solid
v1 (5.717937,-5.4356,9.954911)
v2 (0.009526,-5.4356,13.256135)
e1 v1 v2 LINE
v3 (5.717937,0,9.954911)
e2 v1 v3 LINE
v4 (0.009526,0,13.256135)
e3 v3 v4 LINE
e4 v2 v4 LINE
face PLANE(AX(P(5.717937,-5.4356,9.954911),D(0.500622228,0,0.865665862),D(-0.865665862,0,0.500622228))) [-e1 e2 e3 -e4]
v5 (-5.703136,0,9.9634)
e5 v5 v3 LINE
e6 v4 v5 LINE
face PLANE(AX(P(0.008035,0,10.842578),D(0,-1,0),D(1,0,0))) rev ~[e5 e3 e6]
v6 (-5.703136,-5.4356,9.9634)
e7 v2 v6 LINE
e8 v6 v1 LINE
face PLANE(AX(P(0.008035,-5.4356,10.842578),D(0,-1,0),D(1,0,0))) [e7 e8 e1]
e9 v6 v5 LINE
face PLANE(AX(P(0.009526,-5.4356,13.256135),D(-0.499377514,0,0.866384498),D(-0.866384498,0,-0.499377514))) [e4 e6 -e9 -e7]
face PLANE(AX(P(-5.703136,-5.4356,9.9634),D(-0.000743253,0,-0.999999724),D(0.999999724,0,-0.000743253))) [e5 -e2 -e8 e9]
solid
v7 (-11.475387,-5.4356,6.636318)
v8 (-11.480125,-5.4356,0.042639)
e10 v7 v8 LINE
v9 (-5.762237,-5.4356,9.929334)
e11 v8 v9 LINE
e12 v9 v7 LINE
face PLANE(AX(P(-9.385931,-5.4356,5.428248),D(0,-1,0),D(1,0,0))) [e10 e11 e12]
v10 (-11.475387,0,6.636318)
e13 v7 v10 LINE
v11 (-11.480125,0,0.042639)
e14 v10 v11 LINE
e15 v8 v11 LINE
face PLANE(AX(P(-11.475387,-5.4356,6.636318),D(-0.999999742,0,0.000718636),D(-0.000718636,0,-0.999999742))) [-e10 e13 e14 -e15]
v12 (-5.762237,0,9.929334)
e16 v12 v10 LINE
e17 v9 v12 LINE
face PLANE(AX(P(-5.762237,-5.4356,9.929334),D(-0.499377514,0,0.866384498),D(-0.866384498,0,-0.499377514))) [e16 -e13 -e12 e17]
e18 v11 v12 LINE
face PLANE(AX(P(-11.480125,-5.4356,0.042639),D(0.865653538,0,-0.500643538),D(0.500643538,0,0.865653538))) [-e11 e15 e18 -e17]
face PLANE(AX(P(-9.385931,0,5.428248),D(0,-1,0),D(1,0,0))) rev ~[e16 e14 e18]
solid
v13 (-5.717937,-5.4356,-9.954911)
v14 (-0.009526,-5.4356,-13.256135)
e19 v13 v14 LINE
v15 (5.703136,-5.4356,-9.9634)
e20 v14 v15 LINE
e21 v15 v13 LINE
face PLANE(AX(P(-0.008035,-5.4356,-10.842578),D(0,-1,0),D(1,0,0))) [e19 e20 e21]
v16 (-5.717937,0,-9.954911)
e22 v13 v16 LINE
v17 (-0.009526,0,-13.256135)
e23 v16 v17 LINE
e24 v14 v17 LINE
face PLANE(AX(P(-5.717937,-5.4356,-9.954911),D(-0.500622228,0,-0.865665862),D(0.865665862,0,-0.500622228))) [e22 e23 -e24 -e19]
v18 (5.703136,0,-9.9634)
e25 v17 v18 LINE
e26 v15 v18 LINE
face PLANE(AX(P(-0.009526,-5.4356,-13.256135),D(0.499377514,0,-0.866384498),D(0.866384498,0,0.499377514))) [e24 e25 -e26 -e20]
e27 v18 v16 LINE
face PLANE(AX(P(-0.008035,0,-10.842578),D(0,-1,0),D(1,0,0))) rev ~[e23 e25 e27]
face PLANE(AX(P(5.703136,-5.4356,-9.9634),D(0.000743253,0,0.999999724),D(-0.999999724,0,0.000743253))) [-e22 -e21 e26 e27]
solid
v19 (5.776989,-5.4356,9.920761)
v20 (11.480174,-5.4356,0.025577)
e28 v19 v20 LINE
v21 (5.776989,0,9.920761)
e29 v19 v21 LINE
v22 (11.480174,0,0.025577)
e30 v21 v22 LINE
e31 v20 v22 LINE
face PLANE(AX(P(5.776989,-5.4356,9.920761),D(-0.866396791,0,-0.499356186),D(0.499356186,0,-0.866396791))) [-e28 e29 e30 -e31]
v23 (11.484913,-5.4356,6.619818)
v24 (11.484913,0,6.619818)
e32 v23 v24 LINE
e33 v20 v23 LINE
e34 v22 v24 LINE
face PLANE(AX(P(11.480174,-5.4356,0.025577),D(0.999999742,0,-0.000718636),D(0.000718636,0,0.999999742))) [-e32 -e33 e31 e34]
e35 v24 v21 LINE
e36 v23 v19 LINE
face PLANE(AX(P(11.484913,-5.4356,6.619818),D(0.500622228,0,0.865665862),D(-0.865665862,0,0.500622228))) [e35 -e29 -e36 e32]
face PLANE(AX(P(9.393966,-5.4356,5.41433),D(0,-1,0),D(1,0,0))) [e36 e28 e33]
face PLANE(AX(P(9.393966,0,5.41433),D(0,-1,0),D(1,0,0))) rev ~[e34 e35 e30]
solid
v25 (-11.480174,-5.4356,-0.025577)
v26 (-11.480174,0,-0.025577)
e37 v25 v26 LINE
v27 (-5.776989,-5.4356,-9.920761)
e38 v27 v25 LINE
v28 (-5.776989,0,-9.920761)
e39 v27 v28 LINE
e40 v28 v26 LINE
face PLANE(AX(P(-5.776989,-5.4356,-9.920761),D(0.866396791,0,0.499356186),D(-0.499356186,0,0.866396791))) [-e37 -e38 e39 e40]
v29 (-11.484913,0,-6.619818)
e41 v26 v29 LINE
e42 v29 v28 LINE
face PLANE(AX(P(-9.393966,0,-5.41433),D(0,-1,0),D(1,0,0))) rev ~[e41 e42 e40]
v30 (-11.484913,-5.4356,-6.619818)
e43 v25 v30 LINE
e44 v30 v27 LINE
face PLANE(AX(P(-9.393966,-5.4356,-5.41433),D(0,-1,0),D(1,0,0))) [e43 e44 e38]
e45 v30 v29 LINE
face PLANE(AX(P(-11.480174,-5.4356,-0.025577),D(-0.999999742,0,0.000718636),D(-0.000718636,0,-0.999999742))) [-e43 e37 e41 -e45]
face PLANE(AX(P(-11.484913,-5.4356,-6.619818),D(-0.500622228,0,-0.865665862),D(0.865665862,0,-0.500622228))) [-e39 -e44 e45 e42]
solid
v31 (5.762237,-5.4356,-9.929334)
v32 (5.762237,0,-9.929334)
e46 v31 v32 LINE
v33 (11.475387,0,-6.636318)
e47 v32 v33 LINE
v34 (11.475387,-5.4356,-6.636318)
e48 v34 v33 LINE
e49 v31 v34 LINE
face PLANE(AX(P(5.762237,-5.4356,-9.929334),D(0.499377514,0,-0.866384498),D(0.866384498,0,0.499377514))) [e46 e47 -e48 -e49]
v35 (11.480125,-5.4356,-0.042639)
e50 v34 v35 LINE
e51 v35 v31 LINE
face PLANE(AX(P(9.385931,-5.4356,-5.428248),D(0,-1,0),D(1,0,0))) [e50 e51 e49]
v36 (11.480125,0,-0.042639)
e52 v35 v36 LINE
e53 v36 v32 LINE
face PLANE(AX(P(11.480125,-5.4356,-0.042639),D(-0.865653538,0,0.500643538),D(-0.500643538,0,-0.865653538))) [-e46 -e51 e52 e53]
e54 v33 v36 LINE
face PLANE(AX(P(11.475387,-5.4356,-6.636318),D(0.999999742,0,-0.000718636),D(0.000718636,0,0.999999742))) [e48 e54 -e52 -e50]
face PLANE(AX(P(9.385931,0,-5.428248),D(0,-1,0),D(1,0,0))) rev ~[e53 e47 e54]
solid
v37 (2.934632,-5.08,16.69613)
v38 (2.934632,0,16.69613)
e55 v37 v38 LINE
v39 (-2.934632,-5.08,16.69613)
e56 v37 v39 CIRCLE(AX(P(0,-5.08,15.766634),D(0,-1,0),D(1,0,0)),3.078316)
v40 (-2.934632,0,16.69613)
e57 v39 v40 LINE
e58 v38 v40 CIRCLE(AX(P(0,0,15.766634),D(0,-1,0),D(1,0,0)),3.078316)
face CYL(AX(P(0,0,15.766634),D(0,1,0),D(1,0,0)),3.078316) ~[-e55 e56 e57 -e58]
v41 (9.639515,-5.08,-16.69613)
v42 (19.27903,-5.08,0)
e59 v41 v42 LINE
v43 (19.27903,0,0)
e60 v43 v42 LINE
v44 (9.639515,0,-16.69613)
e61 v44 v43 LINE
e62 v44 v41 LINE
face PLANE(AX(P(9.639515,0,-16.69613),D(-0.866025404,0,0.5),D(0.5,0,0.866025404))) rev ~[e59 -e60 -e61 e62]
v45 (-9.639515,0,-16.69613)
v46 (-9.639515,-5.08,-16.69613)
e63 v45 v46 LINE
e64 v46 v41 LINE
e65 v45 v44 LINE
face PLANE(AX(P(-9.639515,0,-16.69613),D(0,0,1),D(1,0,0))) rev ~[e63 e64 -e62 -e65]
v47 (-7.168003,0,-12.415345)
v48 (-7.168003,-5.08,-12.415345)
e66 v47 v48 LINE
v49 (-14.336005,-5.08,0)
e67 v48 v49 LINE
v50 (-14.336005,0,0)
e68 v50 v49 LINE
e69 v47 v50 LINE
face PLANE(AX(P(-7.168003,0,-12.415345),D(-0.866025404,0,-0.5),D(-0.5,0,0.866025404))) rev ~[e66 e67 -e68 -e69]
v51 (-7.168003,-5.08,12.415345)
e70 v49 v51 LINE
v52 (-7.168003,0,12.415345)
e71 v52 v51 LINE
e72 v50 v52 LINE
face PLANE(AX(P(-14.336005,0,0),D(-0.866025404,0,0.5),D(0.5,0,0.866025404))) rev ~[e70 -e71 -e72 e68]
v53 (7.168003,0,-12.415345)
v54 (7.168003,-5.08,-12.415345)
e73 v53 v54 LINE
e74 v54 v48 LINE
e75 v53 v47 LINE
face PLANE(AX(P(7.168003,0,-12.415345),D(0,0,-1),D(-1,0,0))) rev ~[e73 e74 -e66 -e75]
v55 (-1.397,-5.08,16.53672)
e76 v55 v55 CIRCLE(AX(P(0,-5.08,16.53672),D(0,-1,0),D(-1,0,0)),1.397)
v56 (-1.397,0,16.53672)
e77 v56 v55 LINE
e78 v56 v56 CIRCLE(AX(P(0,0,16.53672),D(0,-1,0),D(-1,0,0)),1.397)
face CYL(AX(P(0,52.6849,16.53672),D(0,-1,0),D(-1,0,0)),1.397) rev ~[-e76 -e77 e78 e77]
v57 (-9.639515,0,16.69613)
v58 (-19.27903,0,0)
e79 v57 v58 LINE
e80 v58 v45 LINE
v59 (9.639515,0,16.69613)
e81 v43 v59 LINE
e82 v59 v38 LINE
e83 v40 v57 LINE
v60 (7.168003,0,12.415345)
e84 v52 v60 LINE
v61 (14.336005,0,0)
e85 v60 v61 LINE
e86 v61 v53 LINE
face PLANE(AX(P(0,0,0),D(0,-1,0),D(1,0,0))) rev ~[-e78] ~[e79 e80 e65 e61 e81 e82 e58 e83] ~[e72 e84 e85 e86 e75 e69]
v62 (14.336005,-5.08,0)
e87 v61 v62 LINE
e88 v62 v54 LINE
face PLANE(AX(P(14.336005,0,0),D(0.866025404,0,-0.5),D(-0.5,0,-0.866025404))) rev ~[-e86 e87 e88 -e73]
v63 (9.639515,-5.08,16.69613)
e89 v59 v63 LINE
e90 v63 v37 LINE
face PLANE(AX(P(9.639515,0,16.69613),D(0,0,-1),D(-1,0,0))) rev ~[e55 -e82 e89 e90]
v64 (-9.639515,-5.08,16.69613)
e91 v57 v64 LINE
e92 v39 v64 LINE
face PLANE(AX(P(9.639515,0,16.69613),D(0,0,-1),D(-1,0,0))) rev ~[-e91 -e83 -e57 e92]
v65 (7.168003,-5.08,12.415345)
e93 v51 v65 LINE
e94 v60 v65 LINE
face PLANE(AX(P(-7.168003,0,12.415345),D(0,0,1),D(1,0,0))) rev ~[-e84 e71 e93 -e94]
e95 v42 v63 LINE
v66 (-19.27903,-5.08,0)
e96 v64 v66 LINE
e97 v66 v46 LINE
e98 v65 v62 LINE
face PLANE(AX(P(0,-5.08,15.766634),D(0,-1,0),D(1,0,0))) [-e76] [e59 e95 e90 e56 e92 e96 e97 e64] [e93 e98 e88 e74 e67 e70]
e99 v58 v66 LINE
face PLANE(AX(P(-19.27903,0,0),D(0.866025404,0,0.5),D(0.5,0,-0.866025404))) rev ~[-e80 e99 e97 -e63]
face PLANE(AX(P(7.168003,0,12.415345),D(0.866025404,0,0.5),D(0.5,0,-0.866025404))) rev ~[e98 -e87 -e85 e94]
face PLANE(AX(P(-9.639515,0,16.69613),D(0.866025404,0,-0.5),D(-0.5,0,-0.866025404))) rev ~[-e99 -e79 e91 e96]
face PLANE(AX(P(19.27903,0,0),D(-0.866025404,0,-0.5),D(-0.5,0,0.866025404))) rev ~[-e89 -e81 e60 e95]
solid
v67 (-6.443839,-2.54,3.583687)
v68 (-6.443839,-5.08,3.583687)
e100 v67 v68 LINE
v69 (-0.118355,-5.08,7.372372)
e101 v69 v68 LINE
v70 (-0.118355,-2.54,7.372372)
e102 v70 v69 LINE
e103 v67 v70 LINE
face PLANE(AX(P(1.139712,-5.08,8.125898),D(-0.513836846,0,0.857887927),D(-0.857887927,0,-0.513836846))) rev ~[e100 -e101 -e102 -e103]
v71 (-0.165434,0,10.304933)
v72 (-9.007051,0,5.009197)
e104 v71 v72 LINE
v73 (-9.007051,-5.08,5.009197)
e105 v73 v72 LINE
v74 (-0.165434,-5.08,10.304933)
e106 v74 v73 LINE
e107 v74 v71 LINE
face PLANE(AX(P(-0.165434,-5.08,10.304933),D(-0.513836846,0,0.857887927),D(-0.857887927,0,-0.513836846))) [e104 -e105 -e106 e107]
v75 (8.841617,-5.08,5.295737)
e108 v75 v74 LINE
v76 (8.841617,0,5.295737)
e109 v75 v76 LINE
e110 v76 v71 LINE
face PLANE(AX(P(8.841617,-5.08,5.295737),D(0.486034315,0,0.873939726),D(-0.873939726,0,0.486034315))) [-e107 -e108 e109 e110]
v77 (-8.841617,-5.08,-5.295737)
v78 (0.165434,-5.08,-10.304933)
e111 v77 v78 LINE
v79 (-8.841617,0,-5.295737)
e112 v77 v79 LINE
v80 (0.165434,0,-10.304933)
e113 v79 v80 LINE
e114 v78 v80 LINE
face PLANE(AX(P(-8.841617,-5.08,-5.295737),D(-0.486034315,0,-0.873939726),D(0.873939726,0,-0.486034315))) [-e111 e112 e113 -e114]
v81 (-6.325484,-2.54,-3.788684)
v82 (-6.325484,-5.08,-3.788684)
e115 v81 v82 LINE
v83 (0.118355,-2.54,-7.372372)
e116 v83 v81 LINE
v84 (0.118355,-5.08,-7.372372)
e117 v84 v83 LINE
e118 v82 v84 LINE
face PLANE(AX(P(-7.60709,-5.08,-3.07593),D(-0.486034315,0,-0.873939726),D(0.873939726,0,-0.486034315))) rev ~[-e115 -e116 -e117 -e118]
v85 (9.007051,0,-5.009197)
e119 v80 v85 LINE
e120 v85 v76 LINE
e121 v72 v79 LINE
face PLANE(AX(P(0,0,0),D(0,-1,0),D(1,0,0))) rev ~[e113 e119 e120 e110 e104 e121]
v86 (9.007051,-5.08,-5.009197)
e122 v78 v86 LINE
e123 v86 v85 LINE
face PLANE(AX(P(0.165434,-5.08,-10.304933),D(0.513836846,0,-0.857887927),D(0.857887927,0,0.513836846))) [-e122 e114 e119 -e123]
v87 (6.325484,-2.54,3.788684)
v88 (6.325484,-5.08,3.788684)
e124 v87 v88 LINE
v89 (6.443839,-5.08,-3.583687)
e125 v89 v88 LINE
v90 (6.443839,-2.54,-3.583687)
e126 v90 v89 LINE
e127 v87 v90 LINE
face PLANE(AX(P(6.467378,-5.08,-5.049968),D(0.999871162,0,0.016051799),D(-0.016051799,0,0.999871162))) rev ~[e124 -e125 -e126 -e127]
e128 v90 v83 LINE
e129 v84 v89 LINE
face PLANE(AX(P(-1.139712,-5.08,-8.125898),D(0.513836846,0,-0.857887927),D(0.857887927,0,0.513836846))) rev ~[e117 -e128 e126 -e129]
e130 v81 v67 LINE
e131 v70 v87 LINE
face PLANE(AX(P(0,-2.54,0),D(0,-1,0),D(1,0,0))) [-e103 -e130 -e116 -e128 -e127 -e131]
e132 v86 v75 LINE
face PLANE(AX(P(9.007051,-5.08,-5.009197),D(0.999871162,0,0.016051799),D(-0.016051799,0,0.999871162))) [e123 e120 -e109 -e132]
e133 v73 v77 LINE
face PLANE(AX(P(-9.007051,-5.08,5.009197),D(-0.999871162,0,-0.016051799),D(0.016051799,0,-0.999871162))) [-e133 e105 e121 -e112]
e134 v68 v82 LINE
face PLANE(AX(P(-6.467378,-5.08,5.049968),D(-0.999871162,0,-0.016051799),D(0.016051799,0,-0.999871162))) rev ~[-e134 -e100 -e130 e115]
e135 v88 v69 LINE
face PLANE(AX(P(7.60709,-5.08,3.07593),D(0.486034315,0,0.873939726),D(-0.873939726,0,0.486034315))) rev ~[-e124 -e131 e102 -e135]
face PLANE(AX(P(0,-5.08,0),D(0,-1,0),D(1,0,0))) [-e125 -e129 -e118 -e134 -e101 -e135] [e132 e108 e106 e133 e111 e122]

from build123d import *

# Parameters (mm, degrees)
F1_DEPTH  = 5.08
F2_R      = 3.0783155003
F3_DEPTH  = 5.08
F5_D      = 2.794
F7_DEPTH  = 5.08
F8_SCALE  = 1.07
F10_DEPTH = 5.08
F11_DEPTH = 1.4986
F14_T     = -2.54


with BuildPart() as f1:
    # F0 (on Front) → F1 (new body)
    with BuildSketch(Plane.XZ):
        Polygon((-9.6395150281, -16.6961297889), (9.6395150281, -16.6961297889), (19.2790300561, 0), (9.6395150281, 16.6961297889), (-9.6395150281, 16.6961297889), (-19.2790300561, 0), align=None)
        Polygon((14.3360053558, 0), (7.1680026779, -12.4153448269), (-7.1680026779, -12.4153448269), (-14.3360053558, 0), (-7.1680026779, 12.4153448269), (7.1680026779, 12.4153448269), align=None, mode=Mode.SUBTRACT)
    extrude(amount=F1_DEPTH)

    # F2 (on Front) → F3 (join)
    with BuildSketch(Plane.XZ):
        with Locations((0, 15.7666336745)):
            Circle(F2_R)
    extrude(amount=F3_DEPTH)

    # F5 (through all)
    with Locations(Plane(origin=(0, 0, 0), x_dir=(1, 0, 0), z_dir=(0, 1, 0))):
        with Locations((0, -16.5367200971)):
            Hole(F5_D / 2)


with BuildPart() as f7:
    # F6 (on face) → F7 (new body)
    with BuildSketch(Plane.XZ.offset(5.08)):
        Polygon((5.3438666064, 9.3036550664), (0.0089031178, 12.3889116569), (-5.3300339055, 9.3115884774), align=None)
    extrude(amount=-F7_DEPTH)


with BuildPart() as f7b:
    # F6 (on face) → F7, piece 2 (new body)
    with BuildSketch(Plane.XZ.offset(5.08)):
        Polygon((10.733563779, 6.1867455022), (5.3990552183, 9.2717390039), (10.7291349388, 0.0239032976), align=None)
    extrude(amount=-F7_DEPTH)


with BuildPart() as f7c:
    # F6 (on face) → F7, piece 3 (new body)
    with BuildSketch(Plane.XZ.offset(5.08)):
        Polygon((-10.7290891237, 0.0398494735), (-5.3852683323, 9.2797517688), (-10.7246606612, 6.2021661546), align=None)
    extrude(amount=-F7_DEPTH)


with BuildPart() as f7d:
    # F6 (on face) → F7, piece 4 (new body)
    with BuildSketch(Plane.XZ.offset(5.08)):
        Polygon((10.7246606612, -6.2021661546), (10.7290891237, -0.0398494735), (5.3852683323, -9.2797517688), align=None)
    extrude(amount=-F7_DEPTH)


with BuildPart() as f7e:
    # F6 (on face) → F7, piece 5 (new body)
    with BuildSketch(Plane.XZ.offset(5.08)):
        Polygon((-5.3990552183, -9.2717390039), (-10.7291349388, -0.0239032976), (-10.733563779, -6.1867455022), align=None)
    extrude(amount=-F7_DEPTH)


with BuildPart() as f7f:
    # F6 (on face) → F7, piece 6 (new body)
    with BuildSketch(Plane.XZ.offset(5.08)):
        Polygon((-0.0089031178, -12.3889116569), (5.3300339055, -9.3115884774), (-5.3438666064, -9.3036550664), align=None)
    extrude(amount=-F7_DEPTH)


with BuildPart() as f7g:
    # F6 (on face) → F7, piece 7 (new body)
    with BuildSketch(Plane.XZ.offset(5.08)):
        Polygon((8.0364226741, -4.6477983427), (8.0398727238, -0.0059756613), (4.025102565, -6.9597615571), align=None)
    extrude(amount=-F7_DEPTH)


with BuildPart() as f7b_1:
    # F8: moved
    add(f7b.part.scale(F8_SCALE))


with BuildPart() as f7d_1:
    # F8: moved
    add(f7d.part.scale(F8_SCALE))


with BuildPart() as f7f_1:
    # F8: moved
    add(f7f.part.scale(F8_SCALE))


with BuildPart() as f7e_1:
    # F8: moved
    add(f7e.part.scale(F8_SCALE))


with BuildPart() as f7c_1:
    # F8: moved
    add(f7c.part.scale(F8_SCALE))


with BuildPart() as f7_1:
    # F8: moved
    add(f7.part.scale(F8_SCALE))


with BuildPart() as f10:
    # F9 (on face) → F10 (new body)
    with BuildSketch(Plane.XZ.offset(5.08)):
        Polygon((0.1654340336, -10.3049334588), (9.0070511764, -5.0091966537), (8.8416171429, 5.2957368051), (-0.1654340336, 10.3049334588), (-9.0070511764, 5.0091966537), (-8.8416171429, -5.2957368051), align=None)
    extrude(amount=-F10_DEPTH)

    # F14
    f14_openings = [f10.faces().sort_by_distance(p)[0] for p in [
        (0, -5.08, 0),
    ]]
    offset(amount=F14_T, openings=f14_openings)


with BuildPart() as f11:
    # F11 (new): a face of the model
    f11_faces = [f7g.part.faces().sort_by_distance(p)[0] for p in [
        (6.7004659876, -5.08, -3.8711785204),
    ]]
    extrude(f11_faces, amount=-F11_DEPTH)


solid = Compound([f1.part, f7b_1.part, f7d_1.part, f7f_1.part, f7e_1.part, f7c_1.part, f7_1.part, f10.part])
